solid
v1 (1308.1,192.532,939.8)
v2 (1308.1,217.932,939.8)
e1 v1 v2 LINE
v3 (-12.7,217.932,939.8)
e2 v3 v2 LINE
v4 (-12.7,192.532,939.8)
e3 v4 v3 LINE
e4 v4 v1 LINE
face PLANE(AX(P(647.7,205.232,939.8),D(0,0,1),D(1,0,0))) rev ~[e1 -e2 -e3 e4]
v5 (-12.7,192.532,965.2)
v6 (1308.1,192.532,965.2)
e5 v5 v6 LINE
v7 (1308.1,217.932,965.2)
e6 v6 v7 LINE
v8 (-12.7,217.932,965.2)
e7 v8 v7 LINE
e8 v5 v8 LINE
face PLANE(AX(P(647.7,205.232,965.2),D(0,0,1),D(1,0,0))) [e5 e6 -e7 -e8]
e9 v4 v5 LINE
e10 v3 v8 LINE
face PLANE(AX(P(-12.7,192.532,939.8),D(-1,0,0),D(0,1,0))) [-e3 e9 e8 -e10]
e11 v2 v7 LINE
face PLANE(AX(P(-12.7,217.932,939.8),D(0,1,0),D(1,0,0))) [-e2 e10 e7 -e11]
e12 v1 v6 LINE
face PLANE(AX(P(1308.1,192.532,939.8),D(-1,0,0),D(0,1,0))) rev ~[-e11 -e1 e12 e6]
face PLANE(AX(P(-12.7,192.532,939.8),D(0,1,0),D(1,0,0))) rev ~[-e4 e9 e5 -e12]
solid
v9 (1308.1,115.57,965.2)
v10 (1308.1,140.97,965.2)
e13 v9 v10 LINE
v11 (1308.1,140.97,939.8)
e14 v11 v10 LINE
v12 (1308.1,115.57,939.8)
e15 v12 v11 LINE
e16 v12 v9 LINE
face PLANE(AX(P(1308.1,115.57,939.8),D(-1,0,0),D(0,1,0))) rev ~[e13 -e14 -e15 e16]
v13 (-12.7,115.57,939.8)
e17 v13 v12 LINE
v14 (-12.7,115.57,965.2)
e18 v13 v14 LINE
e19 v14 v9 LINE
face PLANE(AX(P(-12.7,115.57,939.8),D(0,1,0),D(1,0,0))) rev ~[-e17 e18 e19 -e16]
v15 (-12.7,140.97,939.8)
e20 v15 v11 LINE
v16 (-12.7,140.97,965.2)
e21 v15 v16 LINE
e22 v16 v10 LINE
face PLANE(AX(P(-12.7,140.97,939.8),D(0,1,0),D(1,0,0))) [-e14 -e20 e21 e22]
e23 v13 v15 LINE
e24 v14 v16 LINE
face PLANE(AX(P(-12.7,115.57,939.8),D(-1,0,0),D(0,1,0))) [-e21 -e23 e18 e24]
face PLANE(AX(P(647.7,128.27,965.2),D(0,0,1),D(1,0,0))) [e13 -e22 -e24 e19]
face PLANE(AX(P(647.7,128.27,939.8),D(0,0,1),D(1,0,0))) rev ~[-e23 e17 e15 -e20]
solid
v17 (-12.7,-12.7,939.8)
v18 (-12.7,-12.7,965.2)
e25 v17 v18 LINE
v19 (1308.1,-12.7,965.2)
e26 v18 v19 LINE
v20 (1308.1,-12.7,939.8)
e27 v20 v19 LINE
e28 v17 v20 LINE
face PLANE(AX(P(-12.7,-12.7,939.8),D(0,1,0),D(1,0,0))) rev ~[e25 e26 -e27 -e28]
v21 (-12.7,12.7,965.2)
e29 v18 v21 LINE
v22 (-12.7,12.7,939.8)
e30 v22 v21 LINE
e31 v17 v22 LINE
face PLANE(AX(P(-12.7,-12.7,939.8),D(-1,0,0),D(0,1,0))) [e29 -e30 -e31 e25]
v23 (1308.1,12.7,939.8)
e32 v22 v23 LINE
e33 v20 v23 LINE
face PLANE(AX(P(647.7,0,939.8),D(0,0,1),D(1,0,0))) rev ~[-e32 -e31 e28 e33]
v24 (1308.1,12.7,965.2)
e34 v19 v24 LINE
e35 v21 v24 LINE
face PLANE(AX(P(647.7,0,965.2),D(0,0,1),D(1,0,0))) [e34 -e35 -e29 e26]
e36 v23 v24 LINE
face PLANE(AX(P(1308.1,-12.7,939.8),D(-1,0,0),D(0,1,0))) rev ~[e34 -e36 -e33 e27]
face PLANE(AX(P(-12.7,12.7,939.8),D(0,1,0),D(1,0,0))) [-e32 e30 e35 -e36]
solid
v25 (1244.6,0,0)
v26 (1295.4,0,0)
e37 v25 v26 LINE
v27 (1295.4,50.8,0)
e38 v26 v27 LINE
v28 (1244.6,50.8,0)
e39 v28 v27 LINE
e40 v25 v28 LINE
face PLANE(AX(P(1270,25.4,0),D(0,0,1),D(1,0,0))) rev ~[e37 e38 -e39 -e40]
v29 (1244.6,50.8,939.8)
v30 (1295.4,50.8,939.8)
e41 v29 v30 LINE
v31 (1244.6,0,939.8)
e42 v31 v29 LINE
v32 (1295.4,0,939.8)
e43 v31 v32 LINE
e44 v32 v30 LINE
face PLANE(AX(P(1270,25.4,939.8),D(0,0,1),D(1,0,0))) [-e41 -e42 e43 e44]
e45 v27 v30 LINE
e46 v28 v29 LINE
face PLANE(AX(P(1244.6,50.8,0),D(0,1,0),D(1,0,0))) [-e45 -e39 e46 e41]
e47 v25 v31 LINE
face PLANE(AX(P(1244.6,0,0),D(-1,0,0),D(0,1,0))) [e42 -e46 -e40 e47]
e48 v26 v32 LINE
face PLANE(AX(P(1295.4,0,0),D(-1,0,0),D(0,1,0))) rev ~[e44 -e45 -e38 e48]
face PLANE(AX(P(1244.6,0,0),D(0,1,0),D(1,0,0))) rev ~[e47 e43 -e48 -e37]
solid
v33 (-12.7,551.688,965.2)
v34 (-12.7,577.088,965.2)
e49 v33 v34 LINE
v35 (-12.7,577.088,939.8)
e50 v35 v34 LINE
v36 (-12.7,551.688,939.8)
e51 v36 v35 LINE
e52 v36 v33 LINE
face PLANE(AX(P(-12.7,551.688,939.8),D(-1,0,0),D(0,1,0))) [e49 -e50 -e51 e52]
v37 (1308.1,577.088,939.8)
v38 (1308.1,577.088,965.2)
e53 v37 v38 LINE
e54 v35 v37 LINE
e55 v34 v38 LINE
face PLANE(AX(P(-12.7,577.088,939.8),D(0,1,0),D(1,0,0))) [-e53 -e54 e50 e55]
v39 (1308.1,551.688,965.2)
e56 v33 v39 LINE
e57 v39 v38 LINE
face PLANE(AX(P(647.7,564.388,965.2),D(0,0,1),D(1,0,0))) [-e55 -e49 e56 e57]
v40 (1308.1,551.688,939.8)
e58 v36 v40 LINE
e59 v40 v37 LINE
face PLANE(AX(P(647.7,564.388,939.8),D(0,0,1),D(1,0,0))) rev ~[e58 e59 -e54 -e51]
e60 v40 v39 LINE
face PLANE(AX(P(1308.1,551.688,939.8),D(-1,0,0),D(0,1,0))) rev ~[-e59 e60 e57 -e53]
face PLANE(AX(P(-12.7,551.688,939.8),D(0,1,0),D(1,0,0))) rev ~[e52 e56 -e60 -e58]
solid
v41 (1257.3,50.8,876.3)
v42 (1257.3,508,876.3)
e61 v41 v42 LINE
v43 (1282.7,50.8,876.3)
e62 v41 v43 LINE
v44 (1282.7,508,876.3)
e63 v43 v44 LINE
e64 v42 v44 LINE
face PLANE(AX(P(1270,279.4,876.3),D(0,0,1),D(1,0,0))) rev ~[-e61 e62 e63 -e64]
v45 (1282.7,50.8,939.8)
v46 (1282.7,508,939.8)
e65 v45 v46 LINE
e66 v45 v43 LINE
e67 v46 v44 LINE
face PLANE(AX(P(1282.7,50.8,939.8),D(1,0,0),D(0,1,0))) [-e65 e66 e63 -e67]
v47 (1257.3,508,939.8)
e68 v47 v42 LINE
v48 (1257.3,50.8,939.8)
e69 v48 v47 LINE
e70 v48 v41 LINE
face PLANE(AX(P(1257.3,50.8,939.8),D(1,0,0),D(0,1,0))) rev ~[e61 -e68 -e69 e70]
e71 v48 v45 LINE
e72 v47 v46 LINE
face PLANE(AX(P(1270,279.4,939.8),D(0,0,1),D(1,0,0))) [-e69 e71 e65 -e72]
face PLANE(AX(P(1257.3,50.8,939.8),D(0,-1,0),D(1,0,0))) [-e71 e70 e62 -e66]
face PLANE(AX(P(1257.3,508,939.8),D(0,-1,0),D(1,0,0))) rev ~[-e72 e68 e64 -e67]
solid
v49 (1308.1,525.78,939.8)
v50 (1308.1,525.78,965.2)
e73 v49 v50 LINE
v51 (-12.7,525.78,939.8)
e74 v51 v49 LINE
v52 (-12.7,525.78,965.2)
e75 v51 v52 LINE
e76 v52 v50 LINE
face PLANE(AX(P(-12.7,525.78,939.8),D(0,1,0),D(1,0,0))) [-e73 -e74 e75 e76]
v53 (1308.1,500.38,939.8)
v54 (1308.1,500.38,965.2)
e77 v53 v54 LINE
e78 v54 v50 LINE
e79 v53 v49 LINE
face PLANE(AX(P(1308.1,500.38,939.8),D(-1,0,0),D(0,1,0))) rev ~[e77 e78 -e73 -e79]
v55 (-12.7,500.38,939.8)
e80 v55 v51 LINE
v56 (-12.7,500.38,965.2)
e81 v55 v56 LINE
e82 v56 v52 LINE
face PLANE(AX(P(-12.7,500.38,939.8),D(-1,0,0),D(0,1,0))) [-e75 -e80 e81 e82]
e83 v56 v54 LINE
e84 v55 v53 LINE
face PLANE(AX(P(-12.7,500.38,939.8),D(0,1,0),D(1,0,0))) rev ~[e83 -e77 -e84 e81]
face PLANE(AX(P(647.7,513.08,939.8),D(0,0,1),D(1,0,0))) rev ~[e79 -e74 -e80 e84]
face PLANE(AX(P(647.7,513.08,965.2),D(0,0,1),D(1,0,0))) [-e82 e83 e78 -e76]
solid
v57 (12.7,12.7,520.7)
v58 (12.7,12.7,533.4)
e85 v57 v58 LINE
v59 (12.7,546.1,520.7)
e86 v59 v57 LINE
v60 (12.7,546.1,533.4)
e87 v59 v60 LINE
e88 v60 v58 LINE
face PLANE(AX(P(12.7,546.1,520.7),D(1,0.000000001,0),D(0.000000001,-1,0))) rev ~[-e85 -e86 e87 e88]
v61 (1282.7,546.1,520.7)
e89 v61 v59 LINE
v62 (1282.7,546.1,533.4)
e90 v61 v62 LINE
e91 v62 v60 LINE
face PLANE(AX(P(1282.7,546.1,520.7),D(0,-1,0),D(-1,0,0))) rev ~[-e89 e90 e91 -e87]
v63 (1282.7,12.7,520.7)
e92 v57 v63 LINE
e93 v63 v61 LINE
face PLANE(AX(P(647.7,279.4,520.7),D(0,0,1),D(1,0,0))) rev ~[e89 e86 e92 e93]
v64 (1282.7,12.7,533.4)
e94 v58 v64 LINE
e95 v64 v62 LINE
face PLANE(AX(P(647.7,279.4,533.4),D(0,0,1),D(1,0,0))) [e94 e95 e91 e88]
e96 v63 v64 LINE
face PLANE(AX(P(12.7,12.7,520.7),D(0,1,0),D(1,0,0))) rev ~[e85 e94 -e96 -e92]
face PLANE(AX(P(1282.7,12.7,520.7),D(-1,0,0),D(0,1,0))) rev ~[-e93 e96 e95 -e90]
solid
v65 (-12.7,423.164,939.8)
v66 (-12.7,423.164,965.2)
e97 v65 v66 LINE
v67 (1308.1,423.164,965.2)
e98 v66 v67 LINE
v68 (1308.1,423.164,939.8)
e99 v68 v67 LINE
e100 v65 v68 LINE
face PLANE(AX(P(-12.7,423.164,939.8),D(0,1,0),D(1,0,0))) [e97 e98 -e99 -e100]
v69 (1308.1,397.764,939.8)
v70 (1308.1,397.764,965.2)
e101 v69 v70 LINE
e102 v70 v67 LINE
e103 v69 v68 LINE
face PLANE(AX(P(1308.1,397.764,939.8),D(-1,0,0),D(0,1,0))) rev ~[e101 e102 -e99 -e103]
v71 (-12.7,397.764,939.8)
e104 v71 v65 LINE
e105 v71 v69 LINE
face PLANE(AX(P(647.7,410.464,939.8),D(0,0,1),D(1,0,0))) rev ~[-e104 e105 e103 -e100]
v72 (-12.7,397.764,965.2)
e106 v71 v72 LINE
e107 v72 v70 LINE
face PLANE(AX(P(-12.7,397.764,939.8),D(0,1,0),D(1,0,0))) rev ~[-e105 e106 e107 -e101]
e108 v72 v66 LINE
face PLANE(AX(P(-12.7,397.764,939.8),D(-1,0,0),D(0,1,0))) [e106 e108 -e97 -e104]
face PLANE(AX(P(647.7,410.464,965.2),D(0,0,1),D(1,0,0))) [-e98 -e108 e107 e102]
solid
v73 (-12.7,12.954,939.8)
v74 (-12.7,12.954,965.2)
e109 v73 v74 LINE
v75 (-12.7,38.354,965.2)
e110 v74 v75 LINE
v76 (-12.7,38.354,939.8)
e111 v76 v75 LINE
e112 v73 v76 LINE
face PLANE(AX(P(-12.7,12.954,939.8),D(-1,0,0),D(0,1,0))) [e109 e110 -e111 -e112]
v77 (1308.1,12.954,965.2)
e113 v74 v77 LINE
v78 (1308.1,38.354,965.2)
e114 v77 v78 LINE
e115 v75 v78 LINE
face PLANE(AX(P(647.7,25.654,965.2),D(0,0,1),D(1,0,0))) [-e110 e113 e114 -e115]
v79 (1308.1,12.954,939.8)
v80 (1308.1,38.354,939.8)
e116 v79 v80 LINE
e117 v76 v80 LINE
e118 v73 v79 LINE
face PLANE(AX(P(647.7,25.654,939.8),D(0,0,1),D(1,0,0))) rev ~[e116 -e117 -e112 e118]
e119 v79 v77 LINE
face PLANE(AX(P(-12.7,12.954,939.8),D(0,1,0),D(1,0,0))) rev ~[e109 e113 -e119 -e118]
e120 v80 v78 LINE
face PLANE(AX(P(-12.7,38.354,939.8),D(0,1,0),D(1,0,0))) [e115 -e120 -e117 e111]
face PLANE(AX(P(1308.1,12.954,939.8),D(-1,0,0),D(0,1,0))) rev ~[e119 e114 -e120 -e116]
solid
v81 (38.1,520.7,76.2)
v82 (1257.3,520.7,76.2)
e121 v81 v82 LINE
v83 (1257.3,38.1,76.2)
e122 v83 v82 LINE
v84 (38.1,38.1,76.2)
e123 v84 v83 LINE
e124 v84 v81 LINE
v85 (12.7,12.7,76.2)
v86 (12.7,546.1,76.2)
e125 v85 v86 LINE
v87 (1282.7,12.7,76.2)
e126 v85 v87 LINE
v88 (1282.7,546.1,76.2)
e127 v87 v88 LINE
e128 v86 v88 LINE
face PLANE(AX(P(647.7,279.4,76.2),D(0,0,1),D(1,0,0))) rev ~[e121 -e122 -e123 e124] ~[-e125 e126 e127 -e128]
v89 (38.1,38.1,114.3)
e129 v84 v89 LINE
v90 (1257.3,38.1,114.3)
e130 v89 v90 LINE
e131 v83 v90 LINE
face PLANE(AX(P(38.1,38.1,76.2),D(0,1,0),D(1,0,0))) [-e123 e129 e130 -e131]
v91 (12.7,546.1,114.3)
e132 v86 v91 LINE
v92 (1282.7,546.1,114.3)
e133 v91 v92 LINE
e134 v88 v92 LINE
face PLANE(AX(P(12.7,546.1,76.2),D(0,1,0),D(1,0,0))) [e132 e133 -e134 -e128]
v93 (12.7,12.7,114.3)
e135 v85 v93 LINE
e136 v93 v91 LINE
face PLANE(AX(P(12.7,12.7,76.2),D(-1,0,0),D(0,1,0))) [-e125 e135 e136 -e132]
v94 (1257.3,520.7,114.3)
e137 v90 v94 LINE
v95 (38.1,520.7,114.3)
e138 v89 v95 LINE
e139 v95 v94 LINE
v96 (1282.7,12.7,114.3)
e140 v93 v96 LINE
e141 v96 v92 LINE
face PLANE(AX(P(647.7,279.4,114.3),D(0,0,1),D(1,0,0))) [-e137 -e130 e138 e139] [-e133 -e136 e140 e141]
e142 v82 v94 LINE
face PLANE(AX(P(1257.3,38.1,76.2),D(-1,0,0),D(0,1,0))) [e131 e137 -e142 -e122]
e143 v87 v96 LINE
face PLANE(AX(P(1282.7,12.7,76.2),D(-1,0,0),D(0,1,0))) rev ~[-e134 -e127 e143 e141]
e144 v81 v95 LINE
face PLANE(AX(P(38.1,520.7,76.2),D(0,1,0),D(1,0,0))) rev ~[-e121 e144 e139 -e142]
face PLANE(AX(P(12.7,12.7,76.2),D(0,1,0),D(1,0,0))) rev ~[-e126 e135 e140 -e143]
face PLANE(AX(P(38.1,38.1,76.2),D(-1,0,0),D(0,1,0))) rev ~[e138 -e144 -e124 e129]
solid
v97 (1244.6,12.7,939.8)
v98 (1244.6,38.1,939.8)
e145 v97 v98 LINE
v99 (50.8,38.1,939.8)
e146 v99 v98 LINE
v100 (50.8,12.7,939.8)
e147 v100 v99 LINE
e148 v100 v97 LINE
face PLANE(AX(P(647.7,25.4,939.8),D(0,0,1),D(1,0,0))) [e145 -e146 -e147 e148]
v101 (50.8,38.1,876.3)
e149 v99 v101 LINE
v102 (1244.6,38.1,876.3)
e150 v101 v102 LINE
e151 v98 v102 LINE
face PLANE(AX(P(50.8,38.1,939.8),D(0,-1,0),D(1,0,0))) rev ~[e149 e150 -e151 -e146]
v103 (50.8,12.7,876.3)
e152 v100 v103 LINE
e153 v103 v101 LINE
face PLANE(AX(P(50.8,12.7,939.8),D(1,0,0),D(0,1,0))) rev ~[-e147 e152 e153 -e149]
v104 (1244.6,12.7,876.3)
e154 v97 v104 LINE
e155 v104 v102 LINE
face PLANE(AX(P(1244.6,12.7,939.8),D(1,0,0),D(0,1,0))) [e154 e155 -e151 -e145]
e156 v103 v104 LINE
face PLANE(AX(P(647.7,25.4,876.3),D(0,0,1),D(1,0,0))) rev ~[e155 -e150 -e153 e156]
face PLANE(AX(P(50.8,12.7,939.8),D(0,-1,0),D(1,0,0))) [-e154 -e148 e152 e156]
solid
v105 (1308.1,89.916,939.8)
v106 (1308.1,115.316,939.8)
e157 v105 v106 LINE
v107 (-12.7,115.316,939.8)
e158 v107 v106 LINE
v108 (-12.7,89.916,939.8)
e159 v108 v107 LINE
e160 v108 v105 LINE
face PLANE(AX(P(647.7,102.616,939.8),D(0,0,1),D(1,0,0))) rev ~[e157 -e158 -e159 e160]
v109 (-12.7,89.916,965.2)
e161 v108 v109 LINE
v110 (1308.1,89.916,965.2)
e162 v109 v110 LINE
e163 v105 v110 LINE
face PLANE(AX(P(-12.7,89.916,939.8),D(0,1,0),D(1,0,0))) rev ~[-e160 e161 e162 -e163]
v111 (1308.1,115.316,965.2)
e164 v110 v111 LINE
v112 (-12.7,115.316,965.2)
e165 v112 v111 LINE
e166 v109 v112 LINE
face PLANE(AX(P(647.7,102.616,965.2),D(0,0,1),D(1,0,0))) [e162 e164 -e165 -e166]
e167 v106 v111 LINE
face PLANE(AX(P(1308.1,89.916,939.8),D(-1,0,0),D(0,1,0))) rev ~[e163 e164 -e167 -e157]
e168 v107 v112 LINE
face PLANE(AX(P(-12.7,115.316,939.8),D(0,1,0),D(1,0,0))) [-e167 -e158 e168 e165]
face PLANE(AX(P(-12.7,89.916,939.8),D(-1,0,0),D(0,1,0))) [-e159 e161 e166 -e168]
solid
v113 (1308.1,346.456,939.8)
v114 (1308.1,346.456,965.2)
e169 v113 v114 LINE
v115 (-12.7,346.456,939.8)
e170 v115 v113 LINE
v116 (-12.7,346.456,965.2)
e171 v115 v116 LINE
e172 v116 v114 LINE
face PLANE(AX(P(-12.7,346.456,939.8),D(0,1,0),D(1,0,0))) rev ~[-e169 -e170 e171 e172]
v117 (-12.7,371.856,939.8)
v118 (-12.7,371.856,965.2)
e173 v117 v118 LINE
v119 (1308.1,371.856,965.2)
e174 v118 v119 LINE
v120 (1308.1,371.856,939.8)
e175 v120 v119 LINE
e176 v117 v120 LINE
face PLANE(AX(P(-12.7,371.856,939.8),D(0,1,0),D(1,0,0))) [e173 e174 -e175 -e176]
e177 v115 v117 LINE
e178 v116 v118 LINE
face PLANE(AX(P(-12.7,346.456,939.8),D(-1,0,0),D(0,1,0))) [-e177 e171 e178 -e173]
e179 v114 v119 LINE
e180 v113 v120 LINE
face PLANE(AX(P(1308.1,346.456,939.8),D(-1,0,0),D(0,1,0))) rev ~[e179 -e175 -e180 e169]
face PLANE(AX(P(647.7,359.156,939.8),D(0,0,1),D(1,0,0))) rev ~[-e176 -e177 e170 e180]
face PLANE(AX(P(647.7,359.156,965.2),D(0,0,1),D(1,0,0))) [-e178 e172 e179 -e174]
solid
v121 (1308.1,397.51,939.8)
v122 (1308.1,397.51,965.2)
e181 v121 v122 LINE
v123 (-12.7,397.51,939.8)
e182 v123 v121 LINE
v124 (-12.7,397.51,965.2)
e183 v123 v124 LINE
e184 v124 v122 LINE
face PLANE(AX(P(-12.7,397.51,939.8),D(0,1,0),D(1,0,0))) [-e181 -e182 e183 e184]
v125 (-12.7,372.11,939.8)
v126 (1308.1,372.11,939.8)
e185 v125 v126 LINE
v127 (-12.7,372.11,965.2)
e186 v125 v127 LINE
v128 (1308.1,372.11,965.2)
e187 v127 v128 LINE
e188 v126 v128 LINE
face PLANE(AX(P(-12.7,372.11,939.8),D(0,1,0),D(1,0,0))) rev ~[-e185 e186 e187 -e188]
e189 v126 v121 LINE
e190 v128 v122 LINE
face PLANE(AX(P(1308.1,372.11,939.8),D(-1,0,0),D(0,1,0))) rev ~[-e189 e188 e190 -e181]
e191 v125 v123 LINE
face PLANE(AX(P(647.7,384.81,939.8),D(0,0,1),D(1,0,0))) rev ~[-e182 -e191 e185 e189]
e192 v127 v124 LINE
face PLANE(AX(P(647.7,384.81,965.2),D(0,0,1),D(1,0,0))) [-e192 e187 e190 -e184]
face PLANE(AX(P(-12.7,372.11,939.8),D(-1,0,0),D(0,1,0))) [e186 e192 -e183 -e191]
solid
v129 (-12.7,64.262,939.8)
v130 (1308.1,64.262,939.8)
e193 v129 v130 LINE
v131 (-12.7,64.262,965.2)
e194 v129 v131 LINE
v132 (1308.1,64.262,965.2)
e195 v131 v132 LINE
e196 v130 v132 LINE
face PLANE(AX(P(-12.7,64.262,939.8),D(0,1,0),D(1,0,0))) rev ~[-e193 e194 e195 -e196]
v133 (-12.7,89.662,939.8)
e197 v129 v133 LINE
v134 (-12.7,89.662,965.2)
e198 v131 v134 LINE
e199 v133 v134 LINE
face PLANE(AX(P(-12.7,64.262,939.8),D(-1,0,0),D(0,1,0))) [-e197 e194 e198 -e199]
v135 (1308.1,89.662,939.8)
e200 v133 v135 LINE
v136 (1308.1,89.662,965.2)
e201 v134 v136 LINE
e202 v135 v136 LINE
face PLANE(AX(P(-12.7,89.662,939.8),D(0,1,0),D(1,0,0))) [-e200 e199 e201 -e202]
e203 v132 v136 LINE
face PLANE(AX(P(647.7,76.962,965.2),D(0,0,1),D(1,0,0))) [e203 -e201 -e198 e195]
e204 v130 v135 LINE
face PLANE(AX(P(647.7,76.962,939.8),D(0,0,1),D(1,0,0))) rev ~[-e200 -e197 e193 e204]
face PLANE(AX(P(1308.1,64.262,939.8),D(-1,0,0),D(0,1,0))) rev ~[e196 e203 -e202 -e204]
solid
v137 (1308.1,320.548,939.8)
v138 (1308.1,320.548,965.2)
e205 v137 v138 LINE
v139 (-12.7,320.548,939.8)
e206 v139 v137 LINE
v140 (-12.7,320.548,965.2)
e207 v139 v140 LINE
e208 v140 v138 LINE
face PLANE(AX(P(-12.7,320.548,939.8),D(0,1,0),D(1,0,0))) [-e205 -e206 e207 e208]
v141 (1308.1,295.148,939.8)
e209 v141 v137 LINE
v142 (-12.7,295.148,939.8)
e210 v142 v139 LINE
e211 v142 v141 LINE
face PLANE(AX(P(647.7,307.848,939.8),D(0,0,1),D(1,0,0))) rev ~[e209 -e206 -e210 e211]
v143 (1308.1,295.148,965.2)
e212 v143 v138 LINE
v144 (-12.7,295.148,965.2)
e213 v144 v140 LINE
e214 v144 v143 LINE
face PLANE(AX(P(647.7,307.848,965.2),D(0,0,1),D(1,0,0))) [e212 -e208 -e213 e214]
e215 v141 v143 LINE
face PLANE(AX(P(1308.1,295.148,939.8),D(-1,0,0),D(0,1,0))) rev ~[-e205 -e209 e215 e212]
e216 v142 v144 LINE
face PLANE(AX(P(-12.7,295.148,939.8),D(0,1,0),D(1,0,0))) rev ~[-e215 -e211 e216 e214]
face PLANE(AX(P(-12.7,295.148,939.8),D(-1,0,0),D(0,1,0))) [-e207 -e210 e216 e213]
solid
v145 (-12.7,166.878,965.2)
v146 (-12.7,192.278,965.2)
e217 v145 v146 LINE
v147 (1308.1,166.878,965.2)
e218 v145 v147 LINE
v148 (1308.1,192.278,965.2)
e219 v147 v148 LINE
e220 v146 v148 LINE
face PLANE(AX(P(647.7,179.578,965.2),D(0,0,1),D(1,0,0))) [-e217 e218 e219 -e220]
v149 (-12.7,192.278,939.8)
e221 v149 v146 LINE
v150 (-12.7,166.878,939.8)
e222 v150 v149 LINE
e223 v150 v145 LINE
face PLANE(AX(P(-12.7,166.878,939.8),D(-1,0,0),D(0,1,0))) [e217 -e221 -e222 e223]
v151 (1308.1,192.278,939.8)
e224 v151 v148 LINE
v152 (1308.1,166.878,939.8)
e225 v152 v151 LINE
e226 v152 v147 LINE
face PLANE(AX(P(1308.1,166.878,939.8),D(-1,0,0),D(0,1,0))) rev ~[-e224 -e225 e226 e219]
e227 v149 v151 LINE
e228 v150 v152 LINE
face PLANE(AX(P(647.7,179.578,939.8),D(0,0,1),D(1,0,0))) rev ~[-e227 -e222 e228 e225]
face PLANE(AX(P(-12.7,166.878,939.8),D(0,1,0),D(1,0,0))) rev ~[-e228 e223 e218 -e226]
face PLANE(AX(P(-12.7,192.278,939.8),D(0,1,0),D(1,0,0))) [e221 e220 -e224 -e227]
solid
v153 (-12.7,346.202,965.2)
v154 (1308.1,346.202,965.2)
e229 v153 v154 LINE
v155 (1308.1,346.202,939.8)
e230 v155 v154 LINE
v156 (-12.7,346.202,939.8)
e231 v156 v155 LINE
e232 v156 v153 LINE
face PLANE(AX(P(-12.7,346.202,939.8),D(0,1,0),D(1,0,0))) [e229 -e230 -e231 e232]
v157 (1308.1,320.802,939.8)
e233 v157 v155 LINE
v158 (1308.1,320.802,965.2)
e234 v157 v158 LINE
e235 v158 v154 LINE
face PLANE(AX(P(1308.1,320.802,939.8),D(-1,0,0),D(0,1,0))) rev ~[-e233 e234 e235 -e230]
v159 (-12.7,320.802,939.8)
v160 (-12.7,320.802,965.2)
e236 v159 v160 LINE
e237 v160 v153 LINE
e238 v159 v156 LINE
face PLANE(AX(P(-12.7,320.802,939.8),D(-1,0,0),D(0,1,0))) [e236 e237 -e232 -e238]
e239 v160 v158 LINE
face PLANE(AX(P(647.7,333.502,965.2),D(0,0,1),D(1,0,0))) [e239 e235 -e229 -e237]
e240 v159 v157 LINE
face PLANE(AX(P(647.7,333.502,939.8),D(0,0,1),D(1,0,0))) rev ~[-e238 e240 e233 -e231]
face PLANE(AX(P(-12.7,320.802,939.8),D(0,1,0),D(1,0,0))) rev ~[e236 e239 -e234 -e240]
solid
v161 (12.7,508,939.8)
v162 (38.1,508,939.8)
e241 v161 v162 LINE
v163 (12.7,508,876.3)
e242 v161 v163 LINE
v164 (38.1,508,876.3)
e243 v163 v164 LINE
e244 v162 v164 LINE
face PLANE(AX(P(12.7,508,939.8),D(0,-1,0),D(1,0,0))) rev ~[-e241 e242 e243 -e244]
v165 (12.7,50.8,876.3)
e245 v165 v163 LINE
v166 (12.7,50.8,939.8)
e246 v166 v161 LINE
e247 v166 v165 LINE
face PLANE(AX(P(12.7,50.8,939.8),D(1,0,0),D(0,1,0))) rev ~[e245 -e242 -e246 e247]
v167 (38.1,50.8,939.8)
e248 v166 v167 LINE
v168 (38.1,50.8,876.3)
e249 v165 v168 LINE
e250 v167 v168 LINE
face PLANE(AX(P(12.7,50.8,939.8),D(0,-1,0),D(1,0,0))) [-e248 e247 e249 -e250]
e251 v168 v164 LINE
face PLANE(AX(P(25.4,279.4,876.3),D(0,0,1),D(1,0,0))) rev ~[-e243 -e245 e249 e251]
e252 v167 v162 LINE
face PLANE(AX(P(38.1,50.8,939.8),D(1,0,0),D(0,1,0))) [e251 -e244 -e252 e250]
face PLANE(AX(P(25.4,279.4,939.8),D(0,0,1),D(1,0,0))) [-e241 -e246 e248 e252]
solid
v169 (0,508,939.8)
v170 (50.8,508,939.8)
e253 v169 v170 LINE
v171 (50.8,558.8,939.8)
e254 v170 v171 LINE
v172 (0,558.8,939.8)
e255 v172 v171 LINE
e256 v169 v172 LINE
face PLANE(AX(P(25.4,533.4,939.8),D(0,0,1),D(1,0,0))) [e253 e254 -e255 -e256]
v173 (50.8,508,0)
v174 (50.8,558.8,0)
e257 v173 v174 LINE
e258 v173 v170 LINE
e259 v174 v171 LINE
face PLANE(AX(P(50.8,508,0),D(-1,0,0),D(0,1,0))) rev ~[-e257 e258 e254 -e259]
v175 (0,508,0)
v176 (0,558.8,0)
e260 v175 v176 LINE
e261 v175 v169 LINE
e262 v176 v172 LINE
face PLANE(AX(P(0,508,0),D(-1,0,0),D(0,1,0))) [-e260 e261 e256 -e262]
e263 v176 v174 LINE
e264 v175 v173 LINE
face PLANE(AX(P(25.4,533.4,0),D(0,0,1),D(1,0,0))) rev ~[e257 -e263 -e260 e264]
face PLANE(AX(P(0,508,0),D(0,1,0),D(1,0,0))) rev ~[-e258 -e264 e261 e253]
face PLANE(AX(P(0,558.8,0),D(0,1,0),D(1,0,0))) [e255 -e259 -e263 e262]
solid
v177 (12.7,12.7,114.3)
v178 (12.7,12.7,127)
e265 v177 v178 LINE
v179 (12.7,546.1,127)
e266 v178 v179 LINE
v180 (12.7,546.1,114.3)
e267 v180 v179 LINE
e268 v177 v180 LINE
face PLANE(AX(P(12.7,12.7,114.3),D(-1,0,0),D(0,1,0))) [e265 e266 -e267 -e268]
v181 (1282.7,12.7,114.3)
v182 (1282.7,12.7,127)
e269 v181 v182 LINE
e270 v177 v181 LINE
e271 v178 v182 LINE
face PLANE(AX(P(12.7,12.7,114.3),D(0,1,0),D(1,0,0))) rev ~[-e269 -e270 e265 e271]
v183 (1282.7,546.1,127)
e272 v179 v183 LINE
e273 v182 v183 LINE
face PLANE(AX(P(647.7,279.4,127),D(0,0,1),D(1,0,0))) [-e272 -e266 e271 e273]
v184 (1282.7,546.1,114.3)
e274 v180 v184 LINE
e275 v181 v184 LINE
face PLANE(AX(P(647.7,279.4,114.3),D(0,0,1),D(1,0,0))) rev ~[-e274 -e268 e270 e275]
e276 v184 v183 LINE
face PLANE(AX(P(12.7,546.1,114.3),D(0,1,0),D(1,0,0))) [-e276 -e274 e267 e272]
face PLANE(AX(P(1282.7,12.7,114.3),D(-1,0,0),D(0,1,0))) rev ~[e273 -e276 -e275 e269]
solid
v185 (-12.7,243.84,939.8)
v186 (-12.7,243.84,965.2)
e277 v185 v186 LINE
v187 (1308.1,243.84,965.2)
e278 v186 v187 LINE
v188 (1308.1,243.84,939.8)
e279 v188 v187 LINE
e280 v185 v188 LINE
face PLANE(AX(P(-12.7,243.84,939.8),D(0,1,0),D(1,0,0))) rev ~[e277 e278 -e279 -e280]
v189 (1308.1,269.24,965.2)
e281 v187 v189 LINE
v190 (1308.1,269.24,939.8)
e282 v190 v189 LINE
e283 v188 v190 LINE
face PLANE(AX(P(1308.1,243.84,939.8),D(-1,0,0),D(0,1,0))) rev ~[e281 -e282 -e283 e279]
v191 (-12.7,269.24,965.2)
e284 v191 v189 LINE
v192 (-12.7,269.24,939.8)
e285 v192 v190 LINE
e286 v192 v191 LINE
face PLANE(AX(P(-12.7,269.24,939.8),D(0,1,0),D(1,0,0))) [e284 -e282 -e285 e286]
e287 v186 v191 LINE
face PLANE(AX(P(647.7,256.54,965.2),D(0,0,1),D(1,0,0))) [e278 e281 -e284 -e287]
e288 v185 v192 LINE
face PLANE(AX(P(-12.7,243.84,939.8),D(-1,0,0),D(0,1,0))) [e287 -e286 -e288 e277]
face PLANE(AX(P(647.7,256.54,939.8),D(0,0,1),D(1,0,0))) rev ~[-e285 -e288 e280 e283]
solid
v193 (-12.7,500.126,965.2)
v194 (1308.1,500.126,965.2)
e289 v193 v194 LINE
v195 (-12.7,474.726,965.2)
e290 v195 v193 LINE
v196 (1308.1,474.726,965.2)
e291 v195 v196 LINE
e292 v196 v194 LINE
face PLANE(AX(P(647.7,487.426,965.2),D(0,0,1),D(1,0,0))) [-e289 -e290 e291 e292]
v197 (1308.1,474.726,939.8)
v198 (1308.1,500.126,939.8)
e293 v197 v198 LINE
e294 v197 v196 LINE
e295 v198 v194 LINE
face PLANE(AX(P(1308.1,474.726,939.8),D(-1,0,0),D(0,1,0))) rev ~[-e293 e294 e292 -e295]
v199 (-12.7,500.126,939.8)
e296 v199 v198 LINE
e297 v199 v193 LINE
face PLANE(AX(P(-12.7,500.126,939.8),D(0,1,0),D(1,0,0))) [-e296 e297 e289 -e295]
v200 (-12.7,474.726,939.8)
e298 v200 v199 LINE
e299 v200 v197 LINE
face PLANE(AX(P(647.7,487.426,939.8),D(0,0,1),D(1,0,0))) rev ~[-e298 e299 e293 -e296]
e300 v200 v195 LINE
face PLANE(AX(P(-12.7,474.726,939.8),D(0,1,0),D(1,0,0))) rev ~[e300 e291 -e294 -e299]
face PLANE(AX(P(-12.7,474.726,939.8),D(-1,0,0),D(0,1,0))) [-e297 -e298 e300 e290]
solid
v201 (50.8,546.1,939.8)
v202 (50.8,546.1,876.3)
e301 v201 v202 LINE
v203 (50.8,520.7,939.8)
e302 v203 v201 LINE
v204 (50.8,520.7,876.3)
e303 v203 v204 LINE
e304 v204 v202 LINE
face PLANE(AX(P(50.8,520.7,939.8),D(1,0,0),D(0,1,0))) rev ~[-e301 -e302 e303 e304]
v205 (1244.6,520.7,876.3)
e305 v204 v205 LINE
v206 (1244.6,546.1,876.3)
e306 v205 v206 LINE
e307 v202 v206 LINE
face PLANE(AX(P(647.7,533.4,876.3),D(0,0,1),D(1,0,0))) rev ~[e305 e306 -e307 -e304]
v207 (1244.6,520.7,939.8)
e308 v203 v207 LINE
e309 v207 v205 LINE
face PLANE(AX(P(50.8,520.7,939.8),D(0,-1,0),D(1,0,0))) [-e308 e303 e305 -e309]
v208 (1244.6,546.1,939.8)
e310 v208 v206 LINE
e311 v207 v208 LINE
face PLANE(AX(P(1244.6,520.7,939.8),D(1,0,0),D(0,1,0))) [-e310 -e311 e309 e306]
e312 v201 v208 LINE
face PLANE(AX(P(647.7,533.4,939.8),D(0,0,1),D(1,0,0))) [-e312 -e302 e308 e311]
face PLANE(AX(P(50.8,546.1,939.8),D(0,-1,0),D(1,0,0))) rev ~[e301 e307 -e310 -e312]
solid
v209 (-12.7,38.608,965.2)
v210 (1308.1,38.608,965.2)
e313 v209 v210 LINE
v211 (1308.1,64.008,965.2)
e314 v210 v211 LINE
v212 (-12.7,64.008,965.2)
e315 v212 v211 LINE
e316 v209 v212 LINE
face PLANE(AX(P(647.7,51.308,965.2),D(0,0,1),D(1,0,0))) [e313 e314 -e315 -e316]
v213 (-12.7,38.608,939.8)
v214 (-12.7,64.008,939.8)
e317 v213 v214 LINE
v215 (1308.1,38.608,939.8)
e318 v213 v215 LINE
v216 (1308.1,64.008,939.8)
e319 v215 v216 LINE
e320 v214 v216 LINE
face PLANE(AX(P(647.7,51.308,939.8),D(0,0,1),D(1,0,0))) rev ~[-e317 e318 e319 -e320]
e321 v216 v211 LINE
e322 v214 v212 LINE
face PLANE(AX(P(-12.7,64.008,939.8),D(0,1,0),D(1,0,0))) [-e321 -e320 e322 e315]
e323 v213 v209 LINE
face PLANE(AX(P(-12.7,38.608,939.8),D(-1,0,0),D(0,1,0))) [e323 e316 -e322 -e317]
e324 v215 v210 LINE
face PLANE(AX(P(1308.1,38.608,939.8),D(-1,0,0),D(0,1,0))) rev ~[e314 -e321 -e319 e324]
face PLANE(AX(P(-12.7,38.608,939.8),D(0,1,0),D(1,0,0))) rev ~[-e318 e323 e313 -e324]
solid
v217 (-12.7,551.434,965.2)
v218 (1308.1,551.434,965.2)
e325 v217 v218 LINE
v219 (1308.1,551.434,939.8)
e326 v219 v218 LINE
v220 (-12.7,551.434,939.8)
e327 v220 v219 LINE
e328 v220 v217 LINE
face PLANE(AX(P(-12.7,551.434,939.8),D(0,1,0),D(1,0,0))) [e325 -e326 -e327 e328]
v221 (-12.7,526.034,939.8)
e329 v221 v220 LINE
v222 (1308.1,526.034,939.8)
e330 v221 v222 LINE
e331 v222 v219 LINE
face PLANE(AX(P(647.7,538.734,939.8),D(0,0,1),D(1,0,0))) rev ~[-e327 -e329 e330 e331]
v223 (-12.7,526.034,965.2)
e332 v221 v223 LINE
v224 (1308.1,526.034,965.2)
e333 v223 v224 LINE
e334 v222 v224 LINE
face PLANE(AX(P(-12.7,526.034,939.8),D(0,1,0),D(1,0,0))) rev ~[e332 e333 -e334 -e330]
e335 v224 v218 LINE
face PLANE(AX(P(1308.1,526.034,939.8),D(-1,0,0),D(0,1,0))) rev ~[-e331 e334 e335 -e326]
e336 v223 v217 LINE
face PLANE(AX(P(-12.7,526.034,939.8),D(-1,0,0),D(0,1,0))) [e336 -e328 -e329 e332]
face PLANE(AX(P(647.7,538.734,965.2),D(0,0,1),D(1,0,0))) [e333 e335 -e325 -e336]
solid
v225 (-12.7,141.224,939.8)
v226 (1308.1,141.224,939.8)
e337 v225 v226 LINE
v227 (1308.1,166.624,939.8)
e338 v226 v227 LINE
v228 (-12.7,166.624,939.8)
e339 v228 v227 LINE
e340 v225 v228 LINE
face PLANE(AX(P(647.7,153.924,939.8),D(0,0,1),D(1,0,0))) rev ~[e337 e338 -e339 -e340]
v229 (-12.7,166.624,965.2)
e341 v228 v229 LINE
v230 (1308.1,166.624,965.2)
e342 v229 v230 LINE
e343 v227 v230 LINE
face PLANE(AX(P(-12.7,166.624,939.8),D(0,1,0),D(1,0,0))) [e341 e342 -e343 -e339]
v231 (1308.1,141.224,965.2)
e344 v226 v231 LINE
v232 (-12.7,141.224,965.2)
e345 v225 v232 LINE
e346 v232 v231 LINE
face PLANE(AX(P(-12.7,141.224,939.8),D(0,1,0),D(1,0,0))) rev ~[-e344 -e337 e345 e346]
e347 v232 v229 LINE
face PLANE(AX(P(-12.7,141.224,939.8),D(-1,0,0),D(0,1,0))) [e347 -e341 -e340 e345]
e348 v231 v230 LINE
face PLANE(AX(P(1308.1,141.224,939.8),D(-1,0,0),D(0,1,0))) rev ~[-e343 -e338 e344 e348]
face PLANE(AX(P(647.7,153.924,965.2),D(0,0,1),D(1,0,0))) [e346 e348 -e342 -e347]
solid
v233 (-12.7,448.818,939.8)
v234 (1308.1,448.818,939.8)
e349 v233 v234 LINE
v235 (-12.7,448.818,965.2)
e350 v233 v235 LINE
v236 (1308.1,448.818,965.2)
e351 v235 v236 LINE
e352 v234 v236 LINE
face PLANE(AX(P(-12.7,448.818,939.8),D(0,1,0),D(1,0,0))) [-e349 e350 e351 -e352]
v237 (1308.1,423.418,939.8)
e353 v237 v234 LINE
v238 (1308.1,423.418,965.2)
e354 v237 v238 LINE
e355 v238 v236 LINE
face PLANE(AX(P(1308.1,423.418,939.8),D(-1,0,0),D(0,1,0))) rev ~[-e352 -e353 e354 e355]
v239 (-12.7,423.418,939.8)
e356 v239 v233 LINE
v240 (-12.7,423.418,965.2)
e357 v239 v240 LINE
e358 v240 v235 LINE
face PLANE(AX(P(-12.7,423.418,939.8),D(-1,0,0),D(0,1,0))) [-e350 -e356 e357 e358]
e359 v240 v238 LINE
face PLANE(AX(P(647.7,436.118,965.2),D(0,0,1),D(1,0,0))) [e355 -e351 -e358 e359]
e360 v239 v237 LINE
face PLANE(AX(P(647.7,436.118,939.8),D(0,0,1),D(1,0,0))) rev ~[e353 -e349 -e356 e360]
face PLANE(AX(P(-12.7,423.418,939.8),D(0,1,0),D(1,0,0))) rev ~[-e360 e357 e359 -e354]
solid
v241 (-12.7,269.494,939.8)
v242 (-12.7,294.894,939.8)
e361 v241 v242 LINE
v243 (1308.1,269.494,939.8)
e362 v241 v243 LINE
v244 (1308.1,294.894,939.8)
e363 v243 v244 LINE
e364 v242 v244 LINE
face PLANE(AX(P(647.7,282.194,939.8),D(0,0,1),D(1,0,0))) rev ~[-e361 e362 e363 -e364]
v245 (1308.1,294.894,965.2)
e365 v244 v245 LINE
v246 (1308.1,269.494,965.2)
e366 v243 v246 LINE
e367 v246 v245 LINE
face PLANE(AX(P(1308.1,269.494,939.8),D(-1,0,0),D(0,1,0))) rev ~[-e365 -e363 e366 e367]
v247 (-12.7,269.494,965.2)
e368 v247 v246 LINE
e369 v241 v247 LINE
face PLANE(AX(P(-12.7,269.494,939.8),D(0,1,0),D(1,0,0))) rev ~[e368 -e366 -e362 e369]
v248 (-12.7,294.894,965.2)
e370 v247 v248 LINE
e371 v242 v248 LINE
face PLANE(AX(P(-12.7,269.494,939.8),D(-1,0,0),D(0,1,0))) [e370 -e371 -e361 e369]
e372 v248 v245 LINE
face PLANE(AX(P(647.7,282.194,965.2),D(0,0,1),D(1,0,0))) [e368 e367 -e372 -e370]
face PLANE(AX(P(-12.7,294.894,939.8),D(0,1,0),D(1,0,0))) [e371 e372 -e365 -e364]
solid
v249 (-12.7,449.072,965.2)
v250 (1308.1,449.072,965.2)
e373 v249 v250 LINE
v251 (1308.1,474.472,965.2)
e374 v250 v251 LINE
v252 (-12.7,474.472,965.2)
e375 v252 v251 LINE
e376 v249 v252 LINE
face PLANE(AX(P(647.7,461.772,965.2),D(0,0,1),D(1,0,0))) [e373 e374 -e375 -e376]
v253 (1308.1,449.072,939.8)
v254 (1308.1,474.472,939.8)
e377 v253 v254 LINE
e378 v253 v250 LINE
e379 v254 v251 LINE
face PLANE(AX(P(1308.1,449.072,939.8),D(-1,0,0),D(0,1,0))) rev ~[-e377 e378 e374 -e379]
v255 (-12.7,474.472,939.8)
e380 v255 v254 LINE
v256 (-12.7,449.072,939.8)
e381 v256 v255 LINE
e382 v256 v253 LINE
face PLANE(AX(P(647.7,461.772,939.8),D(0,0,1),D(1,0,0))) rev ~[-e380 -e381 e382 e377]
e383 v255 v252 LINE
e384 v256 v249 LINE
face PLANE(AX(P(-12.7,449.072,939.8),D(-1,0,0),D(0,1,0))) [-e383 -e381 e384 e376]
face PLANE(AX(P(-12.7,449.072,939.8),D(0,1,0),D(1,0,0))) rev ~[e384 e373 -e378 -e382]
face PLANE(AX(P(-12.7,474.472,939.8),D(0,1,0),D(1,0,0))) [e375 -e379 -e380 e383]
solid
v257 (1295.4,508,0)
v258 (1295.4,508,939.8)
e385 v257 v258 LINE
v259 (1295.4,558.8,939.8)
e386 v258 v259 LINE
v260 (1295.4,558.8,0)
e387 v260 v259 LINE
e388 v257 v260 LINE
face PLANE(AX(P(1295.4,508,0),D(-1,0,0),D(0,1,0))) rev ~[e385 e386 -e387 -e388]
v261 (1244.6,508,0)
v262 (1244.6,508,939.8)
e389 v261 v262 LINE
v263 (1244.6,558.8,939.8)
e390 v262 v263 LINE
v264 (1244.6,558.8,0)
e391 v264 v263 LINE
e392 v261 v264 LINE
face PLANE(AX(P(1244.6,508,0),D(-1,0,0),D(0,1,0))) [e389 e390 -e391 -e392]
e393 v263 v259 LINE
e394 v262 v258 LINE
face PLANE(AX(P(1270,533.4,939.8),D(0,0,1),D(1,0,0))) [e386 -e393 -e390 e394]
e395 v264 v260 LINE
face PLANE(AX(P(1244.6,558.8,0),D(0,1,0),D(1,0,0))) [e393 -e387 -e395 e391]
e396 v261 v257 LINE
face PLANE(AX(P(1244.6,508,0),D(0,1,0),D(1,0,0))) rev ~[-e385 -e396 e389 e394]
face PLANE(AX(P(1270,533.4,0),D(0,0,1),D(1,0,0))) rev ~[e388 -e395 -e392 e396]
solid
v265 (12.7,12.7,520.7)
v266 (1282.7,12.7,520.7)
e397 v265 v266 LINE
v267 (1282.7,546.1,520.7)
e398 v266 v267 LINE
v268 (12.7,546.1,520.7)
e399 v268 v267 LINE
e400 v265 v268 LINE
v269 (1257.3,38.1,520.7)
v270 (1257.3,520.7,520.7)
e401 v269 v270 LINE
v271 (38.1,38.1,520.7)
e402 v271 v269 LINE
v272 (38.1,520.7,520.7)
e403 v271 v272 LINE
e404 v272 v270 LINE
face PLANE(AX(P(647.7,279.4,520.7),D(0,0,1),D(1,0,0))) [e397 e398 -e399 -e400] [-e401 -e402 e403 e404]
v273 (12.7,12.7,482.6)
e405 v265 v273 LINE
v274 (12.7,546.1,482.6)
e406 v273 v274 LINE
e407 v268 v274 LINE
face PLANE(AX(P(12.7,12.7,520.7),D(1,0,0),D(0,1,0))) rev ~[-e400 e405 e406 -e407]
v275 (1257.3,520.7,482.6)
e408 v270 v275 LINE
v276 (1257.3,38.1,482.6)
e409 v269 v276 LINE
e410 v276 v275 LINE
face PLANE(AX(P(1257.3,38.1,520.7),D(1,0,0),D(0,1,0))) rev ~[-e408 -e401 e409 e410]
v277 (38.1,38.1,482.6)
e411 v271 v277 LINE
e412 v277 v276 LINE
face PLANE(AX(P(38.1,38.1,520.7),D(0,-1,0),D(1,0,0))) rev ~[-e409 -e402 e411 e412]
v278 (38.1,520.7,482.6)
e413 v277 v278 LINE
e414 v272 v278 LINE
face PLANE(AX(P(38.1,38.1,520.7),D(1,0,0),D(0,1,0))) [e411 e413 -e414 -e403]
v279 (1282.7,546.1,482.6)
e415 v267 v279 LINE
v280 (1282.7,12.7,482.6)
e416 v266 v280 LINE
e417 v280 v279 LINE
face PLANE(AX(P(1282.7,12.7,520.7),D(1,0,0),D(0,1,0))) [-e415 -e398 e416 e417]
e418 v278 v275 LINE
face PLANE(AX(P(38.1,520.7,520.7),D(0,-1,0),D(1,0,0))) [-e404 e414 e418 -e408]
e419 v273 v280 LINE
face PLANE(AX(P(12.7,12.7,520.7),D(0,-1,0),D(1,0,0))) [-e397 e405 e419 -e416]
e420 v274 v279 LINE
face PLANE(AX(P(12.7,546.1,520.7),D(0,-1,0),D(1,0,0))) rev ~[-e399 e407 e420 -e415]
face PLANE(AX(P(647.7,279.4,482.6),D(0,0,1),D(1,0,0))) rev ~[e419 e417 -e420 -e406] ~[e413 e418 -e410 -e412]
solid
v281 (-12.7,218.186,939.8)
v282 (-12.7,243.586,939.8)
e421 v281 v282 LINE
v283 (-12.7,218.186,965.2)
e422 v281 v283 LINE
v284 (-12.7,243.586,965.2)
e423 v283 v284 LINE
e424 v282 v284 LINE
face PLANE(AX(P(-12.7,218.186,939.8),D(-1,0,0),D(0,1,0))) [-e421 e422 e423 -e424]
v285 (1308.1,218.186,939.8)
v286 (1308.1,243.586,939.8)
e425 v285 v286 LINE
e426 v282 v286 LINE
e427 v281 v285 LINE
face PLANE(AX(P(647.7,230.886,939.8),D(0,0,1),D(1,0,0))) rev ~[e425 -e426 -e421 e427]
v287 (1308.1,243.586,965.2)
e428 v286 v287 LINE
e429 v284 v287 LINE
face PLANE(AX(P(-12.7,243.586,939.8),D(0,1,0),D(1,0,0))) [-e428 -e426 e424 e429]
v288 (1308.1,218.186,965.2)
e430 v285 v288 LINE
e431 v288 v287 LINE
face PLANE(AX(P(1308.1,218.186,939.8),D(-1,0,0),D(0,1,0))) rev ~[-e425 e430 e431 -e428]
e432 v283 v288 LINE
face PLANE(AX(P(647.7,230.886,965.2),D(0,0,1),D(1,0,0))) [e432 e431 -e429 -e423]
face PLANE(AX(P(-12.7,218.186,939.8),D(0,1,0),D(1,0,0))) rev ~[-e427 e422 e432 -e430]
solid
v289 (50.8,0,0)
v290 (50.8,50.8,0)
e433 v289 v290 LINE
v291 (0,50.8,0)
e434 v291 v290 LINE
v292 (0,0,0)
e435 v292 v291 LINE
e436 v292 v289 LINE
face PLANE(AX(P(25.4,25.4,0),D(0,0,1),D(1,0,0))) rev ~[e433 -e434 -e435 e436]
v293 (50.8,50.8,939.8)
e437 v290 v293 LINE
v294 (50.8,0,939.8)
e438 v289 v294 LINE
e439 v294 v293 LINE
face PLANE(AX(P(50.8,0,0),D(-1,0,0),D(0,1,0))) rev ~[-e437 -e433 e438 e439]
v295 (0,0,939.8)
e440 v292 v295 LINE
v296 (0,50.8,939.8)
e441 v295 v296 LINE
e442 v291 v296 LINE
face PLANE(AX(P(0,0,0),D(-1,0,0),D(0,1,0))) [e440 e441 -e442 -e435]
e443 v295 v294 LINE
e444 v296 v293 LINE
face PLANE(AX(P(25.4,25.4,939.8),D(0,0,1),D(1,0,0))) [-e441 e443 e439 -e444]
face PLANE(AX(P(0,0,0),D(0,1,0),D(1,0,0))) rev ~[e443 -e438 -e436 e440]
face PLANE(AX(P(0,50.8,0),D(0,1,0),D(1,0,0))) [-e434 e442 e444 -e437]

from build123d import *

# Parameters (mm, degrees)
F0_W      = 50.8
F0_H      = 50.8
F1_DEPTH  = 939.8
F2_W      = 1193.8
F2_H      = 25.4
F3_DEPTH  = 63.5
F2_W_2    = 25.4
F2_H_2    = 457.2
F5_W      = 1270
F5_H      = 533.4
F5_W_2    = 1219.2
F5_H_2    = 482.6
F6_DEPTH  = 38.1
F7_W      = 1270
F7_H      = 533.4
F8_DEPTH  = 12.7
F10_W     = 1270
F10_H     = 533.4
F10_W_2   = 1219.2
F10_H_2   = 482.6
F11_DEPTH = 38.1
F13_W     = 1320.8
F13_H     = 25.4
F14_DEPTH = 25.4
F12_W     = 1219.2
F12_H     = 482.6
F15_DEPTH = 12.7


# Not quite as in the source:
# - ends of sketch curves that miss each other by under 0.0002 mm in the source are joined


with BuildPart() as f1:
    # F0 (on Top) → F1 (new body)
    with BuildSketch(Plane.XY):
        with Locations((25.4, 25.4)):
            Rectangle(F0_W, F0_H)
    extrude(amount=F1_DEPTH)


with BuildPart() as f1b:
    # F0 (on Top) → F1, piece 2 (new body)
    with BuildSketch(Plane.XY):
        with Locations((25.4, 533.4)):
            Rectangle(F0_W, F0_H)
    extrude(amount=F1_DEPTH)


with BuildPart() as f1c:
    # F0 (on Top) → F1, piece 3 (new body)
    with BuildSketch(Plane.XY):
        with Locations((1270, 25.4)):
            Rectangle(F0_W, F0_H)
    extrude(amount=F1_DEPTH)


with BuildPart() as f1d:
    # F0 (on Top) → F1, piece 4 (new body)
    with BuildSketch(Plane.XY):
        with Locations((1270, 533.4)):
            Rectangle(F0_W, F0_H)
    extrude(amount=F1_DEPTH)


with BuildPart() as f3:
    # F2 (on face) → F3 (new body)
    with BuildSketch(Plane.XY.offset(939.8)):
        with Locations((647.7, 533.4)):
            Rectangle(F2_W, F2_H)
    extrude(amount=-F3_DEPTH)


with BuildPart() as f3b:
    # F2 (on face) → F3, piece 2 (new body)
    with BuildSketch(Plane.XY.offset(939.8)):
        with Locations((647.7, 25.4)):
            Rectangle(F2_W, F2_H)
    extrude(amount=-F3_DEPTH)


with BuildPart() as f3c:
    # F2 (on face) → F3, piece 3 (new body)
    with BuildSketch(Plane.XY.offset(939.8)):
        with Locations((25.4, 279.4)):
            Rectangle(F2_W_2, F2_H_2)
    extrude(amount=-F3_DEPTH)


with BuildPart() as f3d:
    # F2 (on face) → F3, piece 4 (new body)
    with BuildSketch(Plane.XY.offset(939.8)):
        with Locations((1270, 279.4)):
            Rectangle(F2_W_2, F2_H_2)
    extrude(amount=-F3_DEPTH)


with BuildPart() as f6:
    # F5 (on offset) → F6 (new body)
    with BuildSketch(Plane.XY.offset(76.2)):
        with Locations((647.7, 279.4)):
            Rectangle(F5_W, F5_H)
        with Locations((647.7, 279.4)):
            Rectangle(F5_W_2, F5_H_2, mode=Mode.SUBTRACT)
    extrude(amount=F6_DEPTH)


with BuildPart() as f8:
    # F7 (on face) → F8 (new body)
    with BuildSketch(Plane.XY.offset(114.3)):
        with Locations((647.7, 279.4)):
            Rectangle(F7_W, F7_H)
    extrude(amount=F8_DEPTH)


with BuildPart() as f11:
    # F10 (on offset) → F11 (new body)
    with BuildSketch(Plane.XY.offset(520.7)):
        with Locations((647.7, 279.4)):
            Rectangle(F10_W, F10_H)
        with Locations((647.7, 279.4)):
            Rectangle(F10_W_2, F10_H_2, mode=Mode.SUBTRACT)
    extrude(amount=-F11_DEPTH)


with BuildPart() as f14:
    # F13 (on face) → F14 (new body)
    with BuildSketch(Plane.XY.offset(939.8)):
        with Locations((647.7, 0)):
            Rectangle(F13_W, F13_H)
    extrude(amount=F14_DEPTH)


with BuildPart() as f14b:
    # F13 (on face) → F14, piece 2 (new body)
    with BuildSketch(Plane.XY.offset(939.8)):
        with Locations((647.7, 25.654)):
            Rectangle(F13_W, F13_H)
    extrude(amount=F14_DEPTH)


with BuildPart() as f14c:
    # F13 (on face) → F14, piece 3 (new body)
    with BuildSketch(Plane.XY.offset(939.8)):
        with Locations((647.7, 51.308)):
            Rectangle(F13_W, F13_H)
    extrude(amount=F14_DEPTH)


with BuildPart() as f14d:
    # F13 (on face) → F14, piece 4 (new body)
    with BuildSketch(Plane.XY.offset(939.8)):
        with Locations((647.7, 76.962)):
            Rectangle(F13_W, F13_H)
    extrude(amount=F14_DEPTH)


with BuildPart() as f14e:
    # F13 (on face) → F14, piece 5 (new body)
    with BuildSketch(Plane.XY.offset(939.8)):
        with Locations((647.7, 102.616)):
            Rectangle(F13_W, F13_H)
    extrude(amount=F14_DEPTH)


with BuildPart() as f14f:
    # F13 (on face) → F14, piece 6 (new body)
    with BuildSketch(Plane.XY.offset(939.8)):
        with Locations((647.7, 128.27)):
            Rectangle(F13_W, F13_H)
    extrude(amount=F14_DEPTH)


with BuildPart() as f14g:
    # F13 (on face) → F14, piece 7 (new body)
    with BuildSketch(Plane.XY.offset(939.8)):
        with Locations((647.7, 153.924)):
            Rectangle(F13_W, F13_H)
    extrude(amount=F14_DEPTH)


with BuildPart() as f14h:
    # F13 (on face) → F14, piece 8 (new body)
    with BuildSketch(Plane.XY.offset(939.8)):
        with Locations((647.7, 179.578)):
            Rectangle(F13_W, F13_H)
    extrude(amount=F14_DEPTH)


with BuildPart() as f14i:
    # F13 (on face) → F14, piece 9 (new body)
    with BuildSketch(Plane.XY.offset(939.8)):
        with Locations((647.7, 205.232)):
            Rectangle(F13_W, F13_H)
    extrude(amount=F14_DEPTH)


with BuildPart() as f14j:
    # F13 (on face) → F14, piece 10 (new body)
    with BuildSketch(Plane.XY.offset(939.8)):
        with Locations((647.7, 230.886)):
            Rectangle(F13_W, F13_H)
    extrude(amount=F14_DEPTH)


with BuildPart() as f14k:
    # F13 (on face) → F14, piece 11 (new body)
    with BuildSketch(Plane.XY.offset(939.8)):
        with Locations((647.7, 256.54)):
            Rectangle(F13_W, F13_H)
    extrude(amount=F14_DEPTH)


with BuildPart() as f14l:
    # F13 (on face) → F14, piece 12 (new body)
    with BuildSketch(Plane.XY.offset(939.8)):
        with Locations((647.7, 282.194)):
            Rectangle(F13_W, F13_H)
    extrude(amount=F14_DEPTH)


with BuildPart() as f14m:
    # F13 (on face) → F14, piece 13 (new body)
    with BuildSketch(Plane.XY.offset(939.8)):
        with Locations((647.7, 307.848)):
            Rectangle(F13_W, F13_H)
    extrude(amount=F14_DEPTH)


with BuildPart() as f14n:
    # F13 (on face) → F14, piece 14 (new body)
    with BuildSketch(Plane.XY.offset(939.8)):
        with Locations((647.7, 333.502)):
            Rectangle(F13_W, F13_H)
    extrude(amount=F14_DEPTH)


with BuildPart() as f14o:
    # F13 (on face) → F14, piece 15 (new body)
    with BuildSketch(Plane.XY.offset(939.8)):
        with Locations((647.7, 359.156)):
            Rectangle(F13_W, F13_H)
    extrude(amount=F14_DEPTH)


with BuildPart() as f14p:
    # F13 (on face) → F14, piece 16 (new body)
    with BuildSketch(Plane.XY.offset(939.8)):
        with Locations((647.7, 384.81)):
            Rectangle(F13_W, F13_H)
    extrude(amount=F14_DEPTH)


with BuildPart() as f14q:
    # F13 (on face) → F14, piece 17 (new body)
    with BuildSketch(Plane.XY.offset(939.8)):
        with Locations((647.7, 410.464)):
            Rectangle(F13_W, F13_H)
    extrude(amount=F14_DEPTH)


with BuildPart() as f14r:
    # F13 (on face) → F14, piece 18 (new body)
    with BuildSketch(Plane.XY.offset(939.8)):
        with Locations((647.7, 436.118)):
            Rectangle(F13_W, F13_H)
    extrude(amount=F14_DEPTH)


with BuildPart() as f14s:
    # F13 (on face) → F14, piece 19 (new body)
    with BuildSketch(Plane.XY.offset(939.8)):
        with Locations((647.7, 461.772)):
            Rectangle(F13_W, F13_H)
    extrude(amount=F14_DEPTH)


with BuildPart() as f14t:
    # F13 (on face) → F14, piece 20 (new body)
    with BuildSketch(Plane.XY.offset(939.8)):
        with Locations((647.7, 487.426)):
            Rectangle(F13_W, F13_H)
    extrude(amount=F14_DEPTH)


with BuildPart() as f14u:
    # F13 (on face) → F14, piece 21 (new body)
    with BuildSketch(Plane.XY.offset(939.8)):
        with Locations((647.7, 513.08)):
            Rectangle(F13_W, F13_H)
    extrude(amount=F14_DEPTH)


with BuildPart() as f14v:
    # F13 (on face) → F14, piece 22 (new body)
    with BuildSketch(Plane.XY.offset(939.8)):
        with Locations((647.7, 538.734)):
            Rectangle(F13_W, F13_H)
    extrude(amount=F14_DEPTH)


with BuildPart() as f14w:
    # F13 (on face) → F14, piece 23 (new body)
    with BuildSketch(Plane.XY.offset(939.8)):
        with Locations((647.7, 564.388)):
            Rectangle(F13_W, F13_H)
    extrude(amount=F14_DEPTH)


with BuildPart() as f15:
    # F12 (on face) → F15 (new body)
    with BuildSketch(Plane.XY.offset(520.7)):
        Polygon((1282.7, 546.1), (12.6999995756, 546.1), (12.7, 12.7), (1282.5777116191, 12.7), (1282.7, 12.7), align=None)
        with Locations((647.7, 279.4)):
            Rectangle(F12_W, F12_H, mode=Mode.SUBTRACT)
        with Locations((647.7, 279.4)):
            Rectangle(F12_W, F12_H)
    extrude(amount=F15_DEPTH)


solid = Compound([f1.part, f1b.part, f1c.part, f1d.part, f3.part, f3b.part, f3c.part, f3d.part, f6.part, f8.part, f11.part, f14.part, f14b.part, f14c.part, f14d.part, f14e.part, f14f.part, f14g.part, f14h.part, f14i.part, f14j.part, f14k.part, f14l.part, f14m.part, f14n.part, f14o.part, f14p.part, f14q.part, f14r.part, f14s.part, f14t.part, f14u.part, f14v.part, f14w.part, f15.part])
